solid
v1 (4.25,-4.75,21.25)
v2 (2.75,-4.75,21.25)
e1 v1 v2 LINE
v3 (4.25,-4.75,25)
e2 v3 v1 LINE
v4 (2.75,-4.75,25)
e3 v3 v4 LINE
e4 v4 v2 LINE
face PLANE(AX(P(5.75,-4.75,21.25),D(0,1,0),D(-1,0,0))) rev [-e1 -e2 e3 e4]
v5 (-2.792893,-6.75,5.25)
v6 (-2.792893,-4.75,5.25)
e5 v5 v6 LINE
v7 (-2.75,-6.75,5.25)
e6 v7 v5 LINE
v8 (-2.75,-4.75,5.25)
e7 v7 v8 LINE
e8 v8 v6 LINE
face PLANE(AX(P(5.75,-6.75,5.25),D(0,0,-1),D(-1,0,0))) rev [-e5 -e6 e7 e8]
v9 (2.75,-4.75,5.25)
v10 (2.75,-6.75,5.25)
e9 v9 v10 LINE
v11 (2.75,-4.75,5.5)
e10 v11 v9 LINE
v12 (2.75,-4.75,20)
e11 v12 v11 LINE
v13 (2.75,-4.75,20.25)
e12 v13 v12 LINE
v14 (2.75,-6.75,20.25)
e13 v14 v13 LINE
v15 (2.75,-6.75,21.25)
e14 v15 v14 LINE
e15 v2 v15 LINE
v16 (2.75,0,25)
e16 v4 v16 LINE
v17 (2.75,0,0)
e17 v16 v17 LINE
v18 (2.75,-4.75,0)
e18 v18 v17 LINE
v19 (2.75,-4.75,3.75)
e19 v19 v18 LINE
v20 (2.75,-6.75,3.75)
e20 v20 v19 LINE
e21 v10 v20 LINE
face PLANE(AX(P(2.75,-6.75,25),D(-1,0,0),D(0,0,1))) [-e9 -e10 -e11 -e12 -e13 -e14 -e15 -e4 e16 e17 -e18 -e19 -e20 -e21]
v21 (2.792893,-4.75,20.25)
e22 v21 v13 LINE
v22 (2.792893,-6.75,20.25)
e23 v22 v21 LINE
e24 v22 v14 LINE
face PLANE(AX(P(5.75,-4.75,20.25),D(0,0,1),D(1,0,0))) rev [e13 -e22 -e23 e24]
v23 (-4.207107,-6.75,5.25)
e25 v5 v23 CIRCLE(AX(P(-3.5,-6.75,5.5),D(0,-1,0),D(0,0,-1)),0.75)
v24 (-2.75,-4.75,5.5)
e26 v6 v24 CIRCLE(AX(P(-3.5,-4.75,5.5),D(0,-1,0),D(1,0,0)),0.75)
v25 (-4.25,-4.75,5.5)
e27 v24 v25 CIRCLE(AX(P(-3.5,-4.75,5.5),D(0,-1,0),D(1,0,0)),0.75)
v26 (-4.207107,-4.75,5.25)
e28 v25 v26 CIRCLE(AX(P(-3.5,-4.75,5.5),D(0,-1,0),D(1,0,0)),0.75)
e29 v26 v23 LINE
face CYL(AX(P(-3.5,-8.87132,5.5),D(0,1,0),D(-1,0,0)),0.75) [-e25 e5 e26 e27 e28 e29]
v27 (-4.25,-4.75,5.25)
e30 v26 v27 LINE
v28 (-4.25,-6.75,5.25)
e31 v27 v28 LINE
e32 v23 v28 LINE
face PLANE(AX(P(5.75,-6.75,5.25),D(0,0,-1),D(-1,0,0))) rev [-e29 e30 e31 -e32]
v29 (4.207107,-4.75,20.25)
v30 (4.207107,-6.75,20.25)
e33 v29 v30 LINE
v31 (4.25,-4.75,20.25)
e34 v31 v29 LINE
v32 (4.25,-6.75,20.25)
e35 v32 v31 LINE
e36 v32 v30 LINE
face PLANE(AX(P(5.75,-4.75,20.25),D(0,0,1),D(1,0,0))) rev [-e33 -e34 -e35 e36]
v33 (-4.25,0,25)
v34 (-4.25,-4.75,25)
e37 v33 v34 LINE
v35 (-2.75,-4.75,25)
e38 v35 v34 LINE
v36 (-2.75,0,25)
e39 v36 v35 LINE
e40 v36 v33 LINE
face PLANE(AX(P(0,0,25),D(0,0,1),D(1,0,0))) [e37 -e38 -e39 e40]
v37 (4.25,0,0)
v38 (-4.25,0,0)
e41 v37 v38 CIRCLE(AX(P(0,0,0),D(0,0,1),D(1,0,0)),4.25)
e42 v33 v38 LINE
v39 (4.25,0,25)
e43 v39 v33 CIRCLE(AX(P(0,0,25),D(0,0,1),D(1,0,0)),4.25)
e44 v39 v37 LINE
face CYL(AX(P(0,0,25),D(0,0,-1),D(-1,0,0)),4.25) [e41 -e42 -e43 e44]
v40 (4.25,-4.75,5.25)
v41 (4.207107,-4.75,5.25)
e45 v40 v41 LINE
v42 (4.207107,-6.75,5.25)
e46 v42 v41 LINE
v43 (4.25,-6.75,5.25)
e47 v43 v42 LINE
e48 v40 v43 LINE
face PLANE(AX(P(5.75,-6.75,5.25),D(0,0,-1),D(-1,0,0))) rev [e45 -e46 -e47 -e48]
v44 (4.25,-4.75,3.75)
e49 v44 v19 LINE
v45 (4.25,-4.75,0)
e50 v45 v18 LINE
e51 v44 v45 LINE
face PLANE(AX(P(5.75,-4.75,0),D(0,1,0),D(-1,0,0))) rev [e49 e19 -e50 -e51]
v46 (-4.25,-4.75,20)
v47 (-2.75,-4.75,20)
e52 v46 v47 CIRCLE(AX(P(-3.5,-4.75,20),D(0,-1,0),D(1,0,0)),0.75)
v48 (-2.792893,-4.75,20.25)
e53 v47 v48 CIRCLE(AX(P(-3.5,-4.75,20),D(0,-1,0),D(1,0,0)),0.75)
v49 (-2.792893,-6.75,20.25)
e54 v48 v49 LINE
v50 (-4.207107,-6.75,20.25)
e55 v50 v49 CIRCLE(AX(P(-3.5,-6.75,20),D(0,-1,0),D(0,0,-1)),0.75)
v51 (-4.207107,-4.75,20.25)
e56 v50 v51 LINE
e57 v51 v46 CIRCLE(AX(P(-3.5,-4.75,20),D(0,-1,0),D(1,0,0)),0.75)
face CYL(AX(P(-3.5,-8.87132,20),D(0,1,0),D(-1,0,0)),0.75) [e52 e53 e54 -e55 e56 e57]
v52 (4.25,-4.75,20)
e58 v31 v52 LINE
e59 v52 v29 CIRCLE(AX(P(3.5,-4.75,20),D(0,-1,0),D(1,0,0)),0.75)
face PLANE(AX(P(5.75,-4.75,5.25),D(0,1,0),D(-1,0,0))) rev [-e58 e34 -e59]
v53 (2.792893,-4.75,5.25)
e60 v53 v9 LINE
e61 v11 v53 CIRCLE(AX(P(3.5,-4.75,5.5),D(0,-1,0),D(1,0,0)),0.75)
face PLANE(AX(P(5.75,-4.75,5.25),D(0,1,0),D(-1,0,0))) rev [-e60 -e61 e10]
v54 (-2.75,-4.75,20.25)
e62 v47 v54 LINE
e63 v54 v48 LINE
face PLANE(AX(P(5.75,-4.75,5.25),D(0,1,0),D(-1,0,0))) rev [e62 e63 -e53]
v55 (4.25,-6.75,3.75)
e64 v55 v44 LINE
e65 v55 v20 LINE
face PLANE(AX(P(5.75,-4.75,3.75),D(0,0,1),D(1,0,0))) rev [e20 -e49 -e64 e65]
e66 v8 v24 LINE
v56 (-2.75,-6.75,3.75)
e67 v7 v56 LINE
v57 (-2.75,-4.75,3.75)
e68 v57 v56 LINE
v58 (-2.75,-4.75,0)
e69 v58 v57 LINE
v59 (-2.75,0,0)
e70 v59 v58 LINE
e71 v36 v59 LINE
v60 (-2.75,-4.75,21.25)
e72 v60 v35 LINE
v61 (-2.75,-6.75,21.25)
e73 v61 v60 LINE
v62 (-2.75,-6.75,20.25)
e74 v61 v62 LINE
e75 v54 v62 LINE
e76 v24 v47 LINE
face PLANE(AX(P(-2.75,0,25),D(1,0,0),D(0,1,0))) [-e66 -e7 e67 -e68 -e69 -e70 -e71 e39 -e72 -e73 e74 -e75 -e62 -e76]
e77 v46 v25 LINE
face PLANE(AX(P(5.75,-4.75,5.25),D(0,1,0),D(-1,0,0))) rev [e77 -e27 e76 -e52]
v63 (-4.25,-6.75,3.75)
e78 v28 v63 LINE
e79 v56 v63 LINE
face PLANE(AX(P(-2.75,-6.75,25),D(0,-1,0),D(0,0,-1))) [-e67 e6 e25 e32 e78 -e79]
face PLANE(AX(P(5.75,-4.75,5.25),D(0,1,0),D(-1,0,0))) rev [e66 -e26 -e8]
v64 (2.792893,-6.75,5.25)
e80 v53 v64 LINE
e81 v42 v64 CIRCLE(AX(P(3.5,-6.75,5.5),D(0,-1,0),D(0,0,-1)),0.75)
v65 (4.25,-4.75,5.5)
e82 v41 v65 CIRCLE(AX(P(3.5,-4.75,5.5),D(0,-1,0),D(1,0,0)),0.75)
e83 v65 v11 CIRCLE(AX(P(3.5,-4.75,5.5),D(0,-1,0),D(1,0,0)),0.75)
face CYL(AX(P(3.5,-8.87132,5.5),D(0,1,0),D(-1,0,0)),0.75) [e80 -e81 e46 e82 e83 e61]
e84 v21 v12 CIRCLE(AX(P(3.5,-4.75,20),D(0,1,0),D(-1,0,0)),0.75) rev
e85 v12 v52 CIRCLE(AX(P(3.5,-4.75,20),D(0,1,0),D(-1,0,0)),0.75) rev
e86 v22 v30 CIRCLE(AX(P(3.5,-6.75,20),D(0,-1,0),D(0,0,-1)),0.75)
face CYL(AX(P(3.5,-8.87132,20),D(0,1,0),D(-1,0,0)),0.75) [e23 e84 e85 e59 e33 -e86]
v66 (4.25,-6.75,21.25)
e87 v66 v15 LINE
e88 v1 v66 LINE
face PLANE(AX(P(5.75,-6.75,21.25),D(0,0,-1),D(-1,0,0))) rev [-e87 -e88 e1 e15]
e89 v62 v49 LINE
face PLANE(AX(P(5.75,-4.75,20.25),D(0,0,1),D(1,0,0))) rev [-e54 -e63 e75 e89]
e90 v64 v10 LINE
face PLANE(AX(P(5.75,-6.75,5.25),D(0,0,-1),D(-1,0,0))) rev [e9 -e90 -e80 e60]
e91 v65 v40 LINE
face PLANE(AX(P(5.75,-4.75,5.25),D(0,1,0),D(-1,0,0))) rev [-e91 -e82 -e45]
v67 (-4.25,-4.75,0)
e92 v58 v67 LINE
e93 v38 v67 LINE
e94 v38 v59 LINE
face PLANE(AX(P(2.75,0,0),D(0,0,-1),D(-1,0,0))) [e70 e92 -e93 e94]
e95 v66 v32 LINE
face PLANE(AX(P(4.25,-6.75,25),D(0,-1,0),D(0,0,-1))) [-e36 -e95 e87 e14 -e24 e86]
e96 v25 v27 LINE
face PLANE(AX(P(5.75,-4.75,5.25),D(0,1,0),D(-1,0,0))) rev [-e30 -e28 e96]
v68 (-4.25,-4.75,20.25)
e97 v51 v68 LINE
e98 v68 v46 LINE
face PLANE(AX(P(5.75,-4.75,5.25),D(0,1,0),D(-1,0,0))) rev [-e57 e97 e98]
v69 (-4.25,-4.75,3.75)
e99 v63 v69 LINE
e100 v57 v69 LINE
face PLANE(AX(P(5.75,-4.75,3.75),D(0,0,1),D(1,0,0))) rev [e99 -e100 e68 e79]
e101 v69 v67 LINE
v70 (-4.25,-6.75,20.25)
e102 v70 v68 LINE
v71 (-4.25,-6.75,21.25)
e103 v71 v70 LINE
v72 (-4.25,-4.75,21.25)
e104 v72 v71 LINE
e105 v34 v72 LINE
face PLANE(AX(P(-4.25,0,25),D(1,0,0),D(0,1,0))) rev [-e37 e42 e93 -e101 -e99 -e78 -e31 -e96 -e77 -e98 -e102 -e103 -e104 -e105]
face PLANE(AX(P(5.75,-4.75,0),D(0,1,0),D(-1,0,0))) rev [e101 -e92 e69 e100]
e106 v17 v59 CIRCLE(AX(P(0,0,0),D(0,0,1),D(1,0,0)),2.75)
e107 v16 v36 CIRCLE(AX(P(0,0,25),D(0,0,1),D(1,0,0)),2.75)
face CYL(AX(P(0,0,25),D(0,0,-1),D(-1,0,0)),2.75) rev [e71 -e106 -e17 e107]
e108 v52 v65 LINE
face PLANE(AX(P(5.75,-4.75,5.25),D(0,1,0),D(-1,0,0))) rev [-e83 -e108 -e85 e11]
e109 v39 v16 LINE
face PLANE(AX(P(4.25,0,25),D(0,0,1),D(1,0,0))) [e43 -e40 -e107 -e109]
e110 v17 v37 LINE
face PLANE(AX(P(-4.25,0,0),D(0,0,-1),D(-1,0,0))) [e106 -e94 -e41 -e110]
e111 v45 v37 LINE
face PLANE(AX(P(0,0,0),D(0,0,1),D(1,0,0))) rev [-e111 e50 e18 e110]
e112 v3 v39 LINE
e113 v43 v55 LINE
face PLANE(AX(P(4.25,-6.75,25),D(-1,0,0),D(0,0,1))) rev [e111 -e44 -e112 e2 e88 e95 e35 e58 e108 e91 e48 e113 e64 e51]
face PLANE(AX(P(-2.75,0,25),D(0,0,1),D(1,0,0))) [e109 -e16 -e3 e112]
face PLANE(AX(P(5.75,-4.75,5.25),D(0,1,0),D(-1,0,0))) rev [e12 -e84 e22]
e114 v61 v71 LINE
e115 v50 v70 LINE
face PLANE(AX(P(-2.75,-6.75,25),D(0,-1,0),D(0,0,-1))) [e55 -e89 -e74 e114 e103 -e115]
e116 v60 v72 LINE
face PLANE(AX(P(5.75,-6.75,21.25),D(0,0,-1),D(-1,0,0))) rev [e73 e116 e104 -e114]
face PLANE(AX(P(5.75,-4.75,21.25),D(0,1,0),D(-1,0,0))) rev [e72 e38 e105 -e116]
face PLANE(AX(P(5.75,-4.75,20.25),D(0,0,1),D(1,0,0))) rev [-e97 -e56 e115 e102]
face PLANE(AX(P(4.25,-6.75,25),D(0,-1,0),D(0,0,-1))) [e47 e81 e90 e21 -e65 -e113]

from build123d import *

# Parameters (mm, degrees)
SM_BASE_FLANGE_1_DEPTH = 25
SKETCH_6_W             = 3.75
SKETCH_6_H             = 2
SKETCH_6_W_2           = 15
CUT_EXTRUDE_1_DEPTH    = 10
SKETCH_7_R             = 0.75
EXTRUDE_1_DEPTH        = 2


# Sheet-metal steps are written as plain solids
with BuildPart() as part:
    # Sketch 2 → 基体-法兰1 (new body)
    with BuildSketch(Plane.XY):
        with BuildLine():
            Line((4.25, -6.75), (4.25, 0))
            ThreePointArc((4.25, 0), (0, 4.25), (-4.25, 0))
            Line((-4.25, 0), (-4.25, -6.75))
            Line((-4.25, -6.75), (-2.75, -6.75))
            Line((-2.75, -6.75), (-2.75, 0))
            ThreePointArc((-2.75, 0), (0, 2.75), (2.75, 0))
            Line((2.75, 0), (2.75, -6.75))
            Line((2.75, -6.75), (4.25, -6.75))
        make_face()
    extrude(amount=SM_BASE_FLANGE_1_DEPTH)

    # 草图6 → 切除-拉伸1 (cut)
    with BuildSketch(Plane.ZY.offset(4.25)):
        with Locations((1.875, -5.75)):
            Rectangle(SKETCH_6_W, SKETCH_6_H)
        with Locations((12.75, -5.75)):
            Rectangle(SKETCH_6_W_2, SKETCH_6_H)
        with Locations((23.125, -5.75)):
            Rectangle(SKETCH_6_W, SKETCH_6_H)
    extrude(amount=-CUT_EXTRUDE_1_DEPTH, mode=Mode.SUBTRACT)

    # 草图7 → 凸台-拉伸1 (add)
    with BuildSketch(Plane.XZ.offset(4.75)):
        with Locations((-3.5, 20)):
            Circle(SKETCH_7_R)
        with Locations((-3.5, 5.5)):
            Circle(SKETCH_7_R)
        with Locations((3.5, 5.5)):
            Circle(SKETCH_7_R)
        with Locations((3.5, 20)):
            Circle(SKETCH_7_R)
    extrude(amount=EXTRUDE_1_DEPTH)


solid = part.part
